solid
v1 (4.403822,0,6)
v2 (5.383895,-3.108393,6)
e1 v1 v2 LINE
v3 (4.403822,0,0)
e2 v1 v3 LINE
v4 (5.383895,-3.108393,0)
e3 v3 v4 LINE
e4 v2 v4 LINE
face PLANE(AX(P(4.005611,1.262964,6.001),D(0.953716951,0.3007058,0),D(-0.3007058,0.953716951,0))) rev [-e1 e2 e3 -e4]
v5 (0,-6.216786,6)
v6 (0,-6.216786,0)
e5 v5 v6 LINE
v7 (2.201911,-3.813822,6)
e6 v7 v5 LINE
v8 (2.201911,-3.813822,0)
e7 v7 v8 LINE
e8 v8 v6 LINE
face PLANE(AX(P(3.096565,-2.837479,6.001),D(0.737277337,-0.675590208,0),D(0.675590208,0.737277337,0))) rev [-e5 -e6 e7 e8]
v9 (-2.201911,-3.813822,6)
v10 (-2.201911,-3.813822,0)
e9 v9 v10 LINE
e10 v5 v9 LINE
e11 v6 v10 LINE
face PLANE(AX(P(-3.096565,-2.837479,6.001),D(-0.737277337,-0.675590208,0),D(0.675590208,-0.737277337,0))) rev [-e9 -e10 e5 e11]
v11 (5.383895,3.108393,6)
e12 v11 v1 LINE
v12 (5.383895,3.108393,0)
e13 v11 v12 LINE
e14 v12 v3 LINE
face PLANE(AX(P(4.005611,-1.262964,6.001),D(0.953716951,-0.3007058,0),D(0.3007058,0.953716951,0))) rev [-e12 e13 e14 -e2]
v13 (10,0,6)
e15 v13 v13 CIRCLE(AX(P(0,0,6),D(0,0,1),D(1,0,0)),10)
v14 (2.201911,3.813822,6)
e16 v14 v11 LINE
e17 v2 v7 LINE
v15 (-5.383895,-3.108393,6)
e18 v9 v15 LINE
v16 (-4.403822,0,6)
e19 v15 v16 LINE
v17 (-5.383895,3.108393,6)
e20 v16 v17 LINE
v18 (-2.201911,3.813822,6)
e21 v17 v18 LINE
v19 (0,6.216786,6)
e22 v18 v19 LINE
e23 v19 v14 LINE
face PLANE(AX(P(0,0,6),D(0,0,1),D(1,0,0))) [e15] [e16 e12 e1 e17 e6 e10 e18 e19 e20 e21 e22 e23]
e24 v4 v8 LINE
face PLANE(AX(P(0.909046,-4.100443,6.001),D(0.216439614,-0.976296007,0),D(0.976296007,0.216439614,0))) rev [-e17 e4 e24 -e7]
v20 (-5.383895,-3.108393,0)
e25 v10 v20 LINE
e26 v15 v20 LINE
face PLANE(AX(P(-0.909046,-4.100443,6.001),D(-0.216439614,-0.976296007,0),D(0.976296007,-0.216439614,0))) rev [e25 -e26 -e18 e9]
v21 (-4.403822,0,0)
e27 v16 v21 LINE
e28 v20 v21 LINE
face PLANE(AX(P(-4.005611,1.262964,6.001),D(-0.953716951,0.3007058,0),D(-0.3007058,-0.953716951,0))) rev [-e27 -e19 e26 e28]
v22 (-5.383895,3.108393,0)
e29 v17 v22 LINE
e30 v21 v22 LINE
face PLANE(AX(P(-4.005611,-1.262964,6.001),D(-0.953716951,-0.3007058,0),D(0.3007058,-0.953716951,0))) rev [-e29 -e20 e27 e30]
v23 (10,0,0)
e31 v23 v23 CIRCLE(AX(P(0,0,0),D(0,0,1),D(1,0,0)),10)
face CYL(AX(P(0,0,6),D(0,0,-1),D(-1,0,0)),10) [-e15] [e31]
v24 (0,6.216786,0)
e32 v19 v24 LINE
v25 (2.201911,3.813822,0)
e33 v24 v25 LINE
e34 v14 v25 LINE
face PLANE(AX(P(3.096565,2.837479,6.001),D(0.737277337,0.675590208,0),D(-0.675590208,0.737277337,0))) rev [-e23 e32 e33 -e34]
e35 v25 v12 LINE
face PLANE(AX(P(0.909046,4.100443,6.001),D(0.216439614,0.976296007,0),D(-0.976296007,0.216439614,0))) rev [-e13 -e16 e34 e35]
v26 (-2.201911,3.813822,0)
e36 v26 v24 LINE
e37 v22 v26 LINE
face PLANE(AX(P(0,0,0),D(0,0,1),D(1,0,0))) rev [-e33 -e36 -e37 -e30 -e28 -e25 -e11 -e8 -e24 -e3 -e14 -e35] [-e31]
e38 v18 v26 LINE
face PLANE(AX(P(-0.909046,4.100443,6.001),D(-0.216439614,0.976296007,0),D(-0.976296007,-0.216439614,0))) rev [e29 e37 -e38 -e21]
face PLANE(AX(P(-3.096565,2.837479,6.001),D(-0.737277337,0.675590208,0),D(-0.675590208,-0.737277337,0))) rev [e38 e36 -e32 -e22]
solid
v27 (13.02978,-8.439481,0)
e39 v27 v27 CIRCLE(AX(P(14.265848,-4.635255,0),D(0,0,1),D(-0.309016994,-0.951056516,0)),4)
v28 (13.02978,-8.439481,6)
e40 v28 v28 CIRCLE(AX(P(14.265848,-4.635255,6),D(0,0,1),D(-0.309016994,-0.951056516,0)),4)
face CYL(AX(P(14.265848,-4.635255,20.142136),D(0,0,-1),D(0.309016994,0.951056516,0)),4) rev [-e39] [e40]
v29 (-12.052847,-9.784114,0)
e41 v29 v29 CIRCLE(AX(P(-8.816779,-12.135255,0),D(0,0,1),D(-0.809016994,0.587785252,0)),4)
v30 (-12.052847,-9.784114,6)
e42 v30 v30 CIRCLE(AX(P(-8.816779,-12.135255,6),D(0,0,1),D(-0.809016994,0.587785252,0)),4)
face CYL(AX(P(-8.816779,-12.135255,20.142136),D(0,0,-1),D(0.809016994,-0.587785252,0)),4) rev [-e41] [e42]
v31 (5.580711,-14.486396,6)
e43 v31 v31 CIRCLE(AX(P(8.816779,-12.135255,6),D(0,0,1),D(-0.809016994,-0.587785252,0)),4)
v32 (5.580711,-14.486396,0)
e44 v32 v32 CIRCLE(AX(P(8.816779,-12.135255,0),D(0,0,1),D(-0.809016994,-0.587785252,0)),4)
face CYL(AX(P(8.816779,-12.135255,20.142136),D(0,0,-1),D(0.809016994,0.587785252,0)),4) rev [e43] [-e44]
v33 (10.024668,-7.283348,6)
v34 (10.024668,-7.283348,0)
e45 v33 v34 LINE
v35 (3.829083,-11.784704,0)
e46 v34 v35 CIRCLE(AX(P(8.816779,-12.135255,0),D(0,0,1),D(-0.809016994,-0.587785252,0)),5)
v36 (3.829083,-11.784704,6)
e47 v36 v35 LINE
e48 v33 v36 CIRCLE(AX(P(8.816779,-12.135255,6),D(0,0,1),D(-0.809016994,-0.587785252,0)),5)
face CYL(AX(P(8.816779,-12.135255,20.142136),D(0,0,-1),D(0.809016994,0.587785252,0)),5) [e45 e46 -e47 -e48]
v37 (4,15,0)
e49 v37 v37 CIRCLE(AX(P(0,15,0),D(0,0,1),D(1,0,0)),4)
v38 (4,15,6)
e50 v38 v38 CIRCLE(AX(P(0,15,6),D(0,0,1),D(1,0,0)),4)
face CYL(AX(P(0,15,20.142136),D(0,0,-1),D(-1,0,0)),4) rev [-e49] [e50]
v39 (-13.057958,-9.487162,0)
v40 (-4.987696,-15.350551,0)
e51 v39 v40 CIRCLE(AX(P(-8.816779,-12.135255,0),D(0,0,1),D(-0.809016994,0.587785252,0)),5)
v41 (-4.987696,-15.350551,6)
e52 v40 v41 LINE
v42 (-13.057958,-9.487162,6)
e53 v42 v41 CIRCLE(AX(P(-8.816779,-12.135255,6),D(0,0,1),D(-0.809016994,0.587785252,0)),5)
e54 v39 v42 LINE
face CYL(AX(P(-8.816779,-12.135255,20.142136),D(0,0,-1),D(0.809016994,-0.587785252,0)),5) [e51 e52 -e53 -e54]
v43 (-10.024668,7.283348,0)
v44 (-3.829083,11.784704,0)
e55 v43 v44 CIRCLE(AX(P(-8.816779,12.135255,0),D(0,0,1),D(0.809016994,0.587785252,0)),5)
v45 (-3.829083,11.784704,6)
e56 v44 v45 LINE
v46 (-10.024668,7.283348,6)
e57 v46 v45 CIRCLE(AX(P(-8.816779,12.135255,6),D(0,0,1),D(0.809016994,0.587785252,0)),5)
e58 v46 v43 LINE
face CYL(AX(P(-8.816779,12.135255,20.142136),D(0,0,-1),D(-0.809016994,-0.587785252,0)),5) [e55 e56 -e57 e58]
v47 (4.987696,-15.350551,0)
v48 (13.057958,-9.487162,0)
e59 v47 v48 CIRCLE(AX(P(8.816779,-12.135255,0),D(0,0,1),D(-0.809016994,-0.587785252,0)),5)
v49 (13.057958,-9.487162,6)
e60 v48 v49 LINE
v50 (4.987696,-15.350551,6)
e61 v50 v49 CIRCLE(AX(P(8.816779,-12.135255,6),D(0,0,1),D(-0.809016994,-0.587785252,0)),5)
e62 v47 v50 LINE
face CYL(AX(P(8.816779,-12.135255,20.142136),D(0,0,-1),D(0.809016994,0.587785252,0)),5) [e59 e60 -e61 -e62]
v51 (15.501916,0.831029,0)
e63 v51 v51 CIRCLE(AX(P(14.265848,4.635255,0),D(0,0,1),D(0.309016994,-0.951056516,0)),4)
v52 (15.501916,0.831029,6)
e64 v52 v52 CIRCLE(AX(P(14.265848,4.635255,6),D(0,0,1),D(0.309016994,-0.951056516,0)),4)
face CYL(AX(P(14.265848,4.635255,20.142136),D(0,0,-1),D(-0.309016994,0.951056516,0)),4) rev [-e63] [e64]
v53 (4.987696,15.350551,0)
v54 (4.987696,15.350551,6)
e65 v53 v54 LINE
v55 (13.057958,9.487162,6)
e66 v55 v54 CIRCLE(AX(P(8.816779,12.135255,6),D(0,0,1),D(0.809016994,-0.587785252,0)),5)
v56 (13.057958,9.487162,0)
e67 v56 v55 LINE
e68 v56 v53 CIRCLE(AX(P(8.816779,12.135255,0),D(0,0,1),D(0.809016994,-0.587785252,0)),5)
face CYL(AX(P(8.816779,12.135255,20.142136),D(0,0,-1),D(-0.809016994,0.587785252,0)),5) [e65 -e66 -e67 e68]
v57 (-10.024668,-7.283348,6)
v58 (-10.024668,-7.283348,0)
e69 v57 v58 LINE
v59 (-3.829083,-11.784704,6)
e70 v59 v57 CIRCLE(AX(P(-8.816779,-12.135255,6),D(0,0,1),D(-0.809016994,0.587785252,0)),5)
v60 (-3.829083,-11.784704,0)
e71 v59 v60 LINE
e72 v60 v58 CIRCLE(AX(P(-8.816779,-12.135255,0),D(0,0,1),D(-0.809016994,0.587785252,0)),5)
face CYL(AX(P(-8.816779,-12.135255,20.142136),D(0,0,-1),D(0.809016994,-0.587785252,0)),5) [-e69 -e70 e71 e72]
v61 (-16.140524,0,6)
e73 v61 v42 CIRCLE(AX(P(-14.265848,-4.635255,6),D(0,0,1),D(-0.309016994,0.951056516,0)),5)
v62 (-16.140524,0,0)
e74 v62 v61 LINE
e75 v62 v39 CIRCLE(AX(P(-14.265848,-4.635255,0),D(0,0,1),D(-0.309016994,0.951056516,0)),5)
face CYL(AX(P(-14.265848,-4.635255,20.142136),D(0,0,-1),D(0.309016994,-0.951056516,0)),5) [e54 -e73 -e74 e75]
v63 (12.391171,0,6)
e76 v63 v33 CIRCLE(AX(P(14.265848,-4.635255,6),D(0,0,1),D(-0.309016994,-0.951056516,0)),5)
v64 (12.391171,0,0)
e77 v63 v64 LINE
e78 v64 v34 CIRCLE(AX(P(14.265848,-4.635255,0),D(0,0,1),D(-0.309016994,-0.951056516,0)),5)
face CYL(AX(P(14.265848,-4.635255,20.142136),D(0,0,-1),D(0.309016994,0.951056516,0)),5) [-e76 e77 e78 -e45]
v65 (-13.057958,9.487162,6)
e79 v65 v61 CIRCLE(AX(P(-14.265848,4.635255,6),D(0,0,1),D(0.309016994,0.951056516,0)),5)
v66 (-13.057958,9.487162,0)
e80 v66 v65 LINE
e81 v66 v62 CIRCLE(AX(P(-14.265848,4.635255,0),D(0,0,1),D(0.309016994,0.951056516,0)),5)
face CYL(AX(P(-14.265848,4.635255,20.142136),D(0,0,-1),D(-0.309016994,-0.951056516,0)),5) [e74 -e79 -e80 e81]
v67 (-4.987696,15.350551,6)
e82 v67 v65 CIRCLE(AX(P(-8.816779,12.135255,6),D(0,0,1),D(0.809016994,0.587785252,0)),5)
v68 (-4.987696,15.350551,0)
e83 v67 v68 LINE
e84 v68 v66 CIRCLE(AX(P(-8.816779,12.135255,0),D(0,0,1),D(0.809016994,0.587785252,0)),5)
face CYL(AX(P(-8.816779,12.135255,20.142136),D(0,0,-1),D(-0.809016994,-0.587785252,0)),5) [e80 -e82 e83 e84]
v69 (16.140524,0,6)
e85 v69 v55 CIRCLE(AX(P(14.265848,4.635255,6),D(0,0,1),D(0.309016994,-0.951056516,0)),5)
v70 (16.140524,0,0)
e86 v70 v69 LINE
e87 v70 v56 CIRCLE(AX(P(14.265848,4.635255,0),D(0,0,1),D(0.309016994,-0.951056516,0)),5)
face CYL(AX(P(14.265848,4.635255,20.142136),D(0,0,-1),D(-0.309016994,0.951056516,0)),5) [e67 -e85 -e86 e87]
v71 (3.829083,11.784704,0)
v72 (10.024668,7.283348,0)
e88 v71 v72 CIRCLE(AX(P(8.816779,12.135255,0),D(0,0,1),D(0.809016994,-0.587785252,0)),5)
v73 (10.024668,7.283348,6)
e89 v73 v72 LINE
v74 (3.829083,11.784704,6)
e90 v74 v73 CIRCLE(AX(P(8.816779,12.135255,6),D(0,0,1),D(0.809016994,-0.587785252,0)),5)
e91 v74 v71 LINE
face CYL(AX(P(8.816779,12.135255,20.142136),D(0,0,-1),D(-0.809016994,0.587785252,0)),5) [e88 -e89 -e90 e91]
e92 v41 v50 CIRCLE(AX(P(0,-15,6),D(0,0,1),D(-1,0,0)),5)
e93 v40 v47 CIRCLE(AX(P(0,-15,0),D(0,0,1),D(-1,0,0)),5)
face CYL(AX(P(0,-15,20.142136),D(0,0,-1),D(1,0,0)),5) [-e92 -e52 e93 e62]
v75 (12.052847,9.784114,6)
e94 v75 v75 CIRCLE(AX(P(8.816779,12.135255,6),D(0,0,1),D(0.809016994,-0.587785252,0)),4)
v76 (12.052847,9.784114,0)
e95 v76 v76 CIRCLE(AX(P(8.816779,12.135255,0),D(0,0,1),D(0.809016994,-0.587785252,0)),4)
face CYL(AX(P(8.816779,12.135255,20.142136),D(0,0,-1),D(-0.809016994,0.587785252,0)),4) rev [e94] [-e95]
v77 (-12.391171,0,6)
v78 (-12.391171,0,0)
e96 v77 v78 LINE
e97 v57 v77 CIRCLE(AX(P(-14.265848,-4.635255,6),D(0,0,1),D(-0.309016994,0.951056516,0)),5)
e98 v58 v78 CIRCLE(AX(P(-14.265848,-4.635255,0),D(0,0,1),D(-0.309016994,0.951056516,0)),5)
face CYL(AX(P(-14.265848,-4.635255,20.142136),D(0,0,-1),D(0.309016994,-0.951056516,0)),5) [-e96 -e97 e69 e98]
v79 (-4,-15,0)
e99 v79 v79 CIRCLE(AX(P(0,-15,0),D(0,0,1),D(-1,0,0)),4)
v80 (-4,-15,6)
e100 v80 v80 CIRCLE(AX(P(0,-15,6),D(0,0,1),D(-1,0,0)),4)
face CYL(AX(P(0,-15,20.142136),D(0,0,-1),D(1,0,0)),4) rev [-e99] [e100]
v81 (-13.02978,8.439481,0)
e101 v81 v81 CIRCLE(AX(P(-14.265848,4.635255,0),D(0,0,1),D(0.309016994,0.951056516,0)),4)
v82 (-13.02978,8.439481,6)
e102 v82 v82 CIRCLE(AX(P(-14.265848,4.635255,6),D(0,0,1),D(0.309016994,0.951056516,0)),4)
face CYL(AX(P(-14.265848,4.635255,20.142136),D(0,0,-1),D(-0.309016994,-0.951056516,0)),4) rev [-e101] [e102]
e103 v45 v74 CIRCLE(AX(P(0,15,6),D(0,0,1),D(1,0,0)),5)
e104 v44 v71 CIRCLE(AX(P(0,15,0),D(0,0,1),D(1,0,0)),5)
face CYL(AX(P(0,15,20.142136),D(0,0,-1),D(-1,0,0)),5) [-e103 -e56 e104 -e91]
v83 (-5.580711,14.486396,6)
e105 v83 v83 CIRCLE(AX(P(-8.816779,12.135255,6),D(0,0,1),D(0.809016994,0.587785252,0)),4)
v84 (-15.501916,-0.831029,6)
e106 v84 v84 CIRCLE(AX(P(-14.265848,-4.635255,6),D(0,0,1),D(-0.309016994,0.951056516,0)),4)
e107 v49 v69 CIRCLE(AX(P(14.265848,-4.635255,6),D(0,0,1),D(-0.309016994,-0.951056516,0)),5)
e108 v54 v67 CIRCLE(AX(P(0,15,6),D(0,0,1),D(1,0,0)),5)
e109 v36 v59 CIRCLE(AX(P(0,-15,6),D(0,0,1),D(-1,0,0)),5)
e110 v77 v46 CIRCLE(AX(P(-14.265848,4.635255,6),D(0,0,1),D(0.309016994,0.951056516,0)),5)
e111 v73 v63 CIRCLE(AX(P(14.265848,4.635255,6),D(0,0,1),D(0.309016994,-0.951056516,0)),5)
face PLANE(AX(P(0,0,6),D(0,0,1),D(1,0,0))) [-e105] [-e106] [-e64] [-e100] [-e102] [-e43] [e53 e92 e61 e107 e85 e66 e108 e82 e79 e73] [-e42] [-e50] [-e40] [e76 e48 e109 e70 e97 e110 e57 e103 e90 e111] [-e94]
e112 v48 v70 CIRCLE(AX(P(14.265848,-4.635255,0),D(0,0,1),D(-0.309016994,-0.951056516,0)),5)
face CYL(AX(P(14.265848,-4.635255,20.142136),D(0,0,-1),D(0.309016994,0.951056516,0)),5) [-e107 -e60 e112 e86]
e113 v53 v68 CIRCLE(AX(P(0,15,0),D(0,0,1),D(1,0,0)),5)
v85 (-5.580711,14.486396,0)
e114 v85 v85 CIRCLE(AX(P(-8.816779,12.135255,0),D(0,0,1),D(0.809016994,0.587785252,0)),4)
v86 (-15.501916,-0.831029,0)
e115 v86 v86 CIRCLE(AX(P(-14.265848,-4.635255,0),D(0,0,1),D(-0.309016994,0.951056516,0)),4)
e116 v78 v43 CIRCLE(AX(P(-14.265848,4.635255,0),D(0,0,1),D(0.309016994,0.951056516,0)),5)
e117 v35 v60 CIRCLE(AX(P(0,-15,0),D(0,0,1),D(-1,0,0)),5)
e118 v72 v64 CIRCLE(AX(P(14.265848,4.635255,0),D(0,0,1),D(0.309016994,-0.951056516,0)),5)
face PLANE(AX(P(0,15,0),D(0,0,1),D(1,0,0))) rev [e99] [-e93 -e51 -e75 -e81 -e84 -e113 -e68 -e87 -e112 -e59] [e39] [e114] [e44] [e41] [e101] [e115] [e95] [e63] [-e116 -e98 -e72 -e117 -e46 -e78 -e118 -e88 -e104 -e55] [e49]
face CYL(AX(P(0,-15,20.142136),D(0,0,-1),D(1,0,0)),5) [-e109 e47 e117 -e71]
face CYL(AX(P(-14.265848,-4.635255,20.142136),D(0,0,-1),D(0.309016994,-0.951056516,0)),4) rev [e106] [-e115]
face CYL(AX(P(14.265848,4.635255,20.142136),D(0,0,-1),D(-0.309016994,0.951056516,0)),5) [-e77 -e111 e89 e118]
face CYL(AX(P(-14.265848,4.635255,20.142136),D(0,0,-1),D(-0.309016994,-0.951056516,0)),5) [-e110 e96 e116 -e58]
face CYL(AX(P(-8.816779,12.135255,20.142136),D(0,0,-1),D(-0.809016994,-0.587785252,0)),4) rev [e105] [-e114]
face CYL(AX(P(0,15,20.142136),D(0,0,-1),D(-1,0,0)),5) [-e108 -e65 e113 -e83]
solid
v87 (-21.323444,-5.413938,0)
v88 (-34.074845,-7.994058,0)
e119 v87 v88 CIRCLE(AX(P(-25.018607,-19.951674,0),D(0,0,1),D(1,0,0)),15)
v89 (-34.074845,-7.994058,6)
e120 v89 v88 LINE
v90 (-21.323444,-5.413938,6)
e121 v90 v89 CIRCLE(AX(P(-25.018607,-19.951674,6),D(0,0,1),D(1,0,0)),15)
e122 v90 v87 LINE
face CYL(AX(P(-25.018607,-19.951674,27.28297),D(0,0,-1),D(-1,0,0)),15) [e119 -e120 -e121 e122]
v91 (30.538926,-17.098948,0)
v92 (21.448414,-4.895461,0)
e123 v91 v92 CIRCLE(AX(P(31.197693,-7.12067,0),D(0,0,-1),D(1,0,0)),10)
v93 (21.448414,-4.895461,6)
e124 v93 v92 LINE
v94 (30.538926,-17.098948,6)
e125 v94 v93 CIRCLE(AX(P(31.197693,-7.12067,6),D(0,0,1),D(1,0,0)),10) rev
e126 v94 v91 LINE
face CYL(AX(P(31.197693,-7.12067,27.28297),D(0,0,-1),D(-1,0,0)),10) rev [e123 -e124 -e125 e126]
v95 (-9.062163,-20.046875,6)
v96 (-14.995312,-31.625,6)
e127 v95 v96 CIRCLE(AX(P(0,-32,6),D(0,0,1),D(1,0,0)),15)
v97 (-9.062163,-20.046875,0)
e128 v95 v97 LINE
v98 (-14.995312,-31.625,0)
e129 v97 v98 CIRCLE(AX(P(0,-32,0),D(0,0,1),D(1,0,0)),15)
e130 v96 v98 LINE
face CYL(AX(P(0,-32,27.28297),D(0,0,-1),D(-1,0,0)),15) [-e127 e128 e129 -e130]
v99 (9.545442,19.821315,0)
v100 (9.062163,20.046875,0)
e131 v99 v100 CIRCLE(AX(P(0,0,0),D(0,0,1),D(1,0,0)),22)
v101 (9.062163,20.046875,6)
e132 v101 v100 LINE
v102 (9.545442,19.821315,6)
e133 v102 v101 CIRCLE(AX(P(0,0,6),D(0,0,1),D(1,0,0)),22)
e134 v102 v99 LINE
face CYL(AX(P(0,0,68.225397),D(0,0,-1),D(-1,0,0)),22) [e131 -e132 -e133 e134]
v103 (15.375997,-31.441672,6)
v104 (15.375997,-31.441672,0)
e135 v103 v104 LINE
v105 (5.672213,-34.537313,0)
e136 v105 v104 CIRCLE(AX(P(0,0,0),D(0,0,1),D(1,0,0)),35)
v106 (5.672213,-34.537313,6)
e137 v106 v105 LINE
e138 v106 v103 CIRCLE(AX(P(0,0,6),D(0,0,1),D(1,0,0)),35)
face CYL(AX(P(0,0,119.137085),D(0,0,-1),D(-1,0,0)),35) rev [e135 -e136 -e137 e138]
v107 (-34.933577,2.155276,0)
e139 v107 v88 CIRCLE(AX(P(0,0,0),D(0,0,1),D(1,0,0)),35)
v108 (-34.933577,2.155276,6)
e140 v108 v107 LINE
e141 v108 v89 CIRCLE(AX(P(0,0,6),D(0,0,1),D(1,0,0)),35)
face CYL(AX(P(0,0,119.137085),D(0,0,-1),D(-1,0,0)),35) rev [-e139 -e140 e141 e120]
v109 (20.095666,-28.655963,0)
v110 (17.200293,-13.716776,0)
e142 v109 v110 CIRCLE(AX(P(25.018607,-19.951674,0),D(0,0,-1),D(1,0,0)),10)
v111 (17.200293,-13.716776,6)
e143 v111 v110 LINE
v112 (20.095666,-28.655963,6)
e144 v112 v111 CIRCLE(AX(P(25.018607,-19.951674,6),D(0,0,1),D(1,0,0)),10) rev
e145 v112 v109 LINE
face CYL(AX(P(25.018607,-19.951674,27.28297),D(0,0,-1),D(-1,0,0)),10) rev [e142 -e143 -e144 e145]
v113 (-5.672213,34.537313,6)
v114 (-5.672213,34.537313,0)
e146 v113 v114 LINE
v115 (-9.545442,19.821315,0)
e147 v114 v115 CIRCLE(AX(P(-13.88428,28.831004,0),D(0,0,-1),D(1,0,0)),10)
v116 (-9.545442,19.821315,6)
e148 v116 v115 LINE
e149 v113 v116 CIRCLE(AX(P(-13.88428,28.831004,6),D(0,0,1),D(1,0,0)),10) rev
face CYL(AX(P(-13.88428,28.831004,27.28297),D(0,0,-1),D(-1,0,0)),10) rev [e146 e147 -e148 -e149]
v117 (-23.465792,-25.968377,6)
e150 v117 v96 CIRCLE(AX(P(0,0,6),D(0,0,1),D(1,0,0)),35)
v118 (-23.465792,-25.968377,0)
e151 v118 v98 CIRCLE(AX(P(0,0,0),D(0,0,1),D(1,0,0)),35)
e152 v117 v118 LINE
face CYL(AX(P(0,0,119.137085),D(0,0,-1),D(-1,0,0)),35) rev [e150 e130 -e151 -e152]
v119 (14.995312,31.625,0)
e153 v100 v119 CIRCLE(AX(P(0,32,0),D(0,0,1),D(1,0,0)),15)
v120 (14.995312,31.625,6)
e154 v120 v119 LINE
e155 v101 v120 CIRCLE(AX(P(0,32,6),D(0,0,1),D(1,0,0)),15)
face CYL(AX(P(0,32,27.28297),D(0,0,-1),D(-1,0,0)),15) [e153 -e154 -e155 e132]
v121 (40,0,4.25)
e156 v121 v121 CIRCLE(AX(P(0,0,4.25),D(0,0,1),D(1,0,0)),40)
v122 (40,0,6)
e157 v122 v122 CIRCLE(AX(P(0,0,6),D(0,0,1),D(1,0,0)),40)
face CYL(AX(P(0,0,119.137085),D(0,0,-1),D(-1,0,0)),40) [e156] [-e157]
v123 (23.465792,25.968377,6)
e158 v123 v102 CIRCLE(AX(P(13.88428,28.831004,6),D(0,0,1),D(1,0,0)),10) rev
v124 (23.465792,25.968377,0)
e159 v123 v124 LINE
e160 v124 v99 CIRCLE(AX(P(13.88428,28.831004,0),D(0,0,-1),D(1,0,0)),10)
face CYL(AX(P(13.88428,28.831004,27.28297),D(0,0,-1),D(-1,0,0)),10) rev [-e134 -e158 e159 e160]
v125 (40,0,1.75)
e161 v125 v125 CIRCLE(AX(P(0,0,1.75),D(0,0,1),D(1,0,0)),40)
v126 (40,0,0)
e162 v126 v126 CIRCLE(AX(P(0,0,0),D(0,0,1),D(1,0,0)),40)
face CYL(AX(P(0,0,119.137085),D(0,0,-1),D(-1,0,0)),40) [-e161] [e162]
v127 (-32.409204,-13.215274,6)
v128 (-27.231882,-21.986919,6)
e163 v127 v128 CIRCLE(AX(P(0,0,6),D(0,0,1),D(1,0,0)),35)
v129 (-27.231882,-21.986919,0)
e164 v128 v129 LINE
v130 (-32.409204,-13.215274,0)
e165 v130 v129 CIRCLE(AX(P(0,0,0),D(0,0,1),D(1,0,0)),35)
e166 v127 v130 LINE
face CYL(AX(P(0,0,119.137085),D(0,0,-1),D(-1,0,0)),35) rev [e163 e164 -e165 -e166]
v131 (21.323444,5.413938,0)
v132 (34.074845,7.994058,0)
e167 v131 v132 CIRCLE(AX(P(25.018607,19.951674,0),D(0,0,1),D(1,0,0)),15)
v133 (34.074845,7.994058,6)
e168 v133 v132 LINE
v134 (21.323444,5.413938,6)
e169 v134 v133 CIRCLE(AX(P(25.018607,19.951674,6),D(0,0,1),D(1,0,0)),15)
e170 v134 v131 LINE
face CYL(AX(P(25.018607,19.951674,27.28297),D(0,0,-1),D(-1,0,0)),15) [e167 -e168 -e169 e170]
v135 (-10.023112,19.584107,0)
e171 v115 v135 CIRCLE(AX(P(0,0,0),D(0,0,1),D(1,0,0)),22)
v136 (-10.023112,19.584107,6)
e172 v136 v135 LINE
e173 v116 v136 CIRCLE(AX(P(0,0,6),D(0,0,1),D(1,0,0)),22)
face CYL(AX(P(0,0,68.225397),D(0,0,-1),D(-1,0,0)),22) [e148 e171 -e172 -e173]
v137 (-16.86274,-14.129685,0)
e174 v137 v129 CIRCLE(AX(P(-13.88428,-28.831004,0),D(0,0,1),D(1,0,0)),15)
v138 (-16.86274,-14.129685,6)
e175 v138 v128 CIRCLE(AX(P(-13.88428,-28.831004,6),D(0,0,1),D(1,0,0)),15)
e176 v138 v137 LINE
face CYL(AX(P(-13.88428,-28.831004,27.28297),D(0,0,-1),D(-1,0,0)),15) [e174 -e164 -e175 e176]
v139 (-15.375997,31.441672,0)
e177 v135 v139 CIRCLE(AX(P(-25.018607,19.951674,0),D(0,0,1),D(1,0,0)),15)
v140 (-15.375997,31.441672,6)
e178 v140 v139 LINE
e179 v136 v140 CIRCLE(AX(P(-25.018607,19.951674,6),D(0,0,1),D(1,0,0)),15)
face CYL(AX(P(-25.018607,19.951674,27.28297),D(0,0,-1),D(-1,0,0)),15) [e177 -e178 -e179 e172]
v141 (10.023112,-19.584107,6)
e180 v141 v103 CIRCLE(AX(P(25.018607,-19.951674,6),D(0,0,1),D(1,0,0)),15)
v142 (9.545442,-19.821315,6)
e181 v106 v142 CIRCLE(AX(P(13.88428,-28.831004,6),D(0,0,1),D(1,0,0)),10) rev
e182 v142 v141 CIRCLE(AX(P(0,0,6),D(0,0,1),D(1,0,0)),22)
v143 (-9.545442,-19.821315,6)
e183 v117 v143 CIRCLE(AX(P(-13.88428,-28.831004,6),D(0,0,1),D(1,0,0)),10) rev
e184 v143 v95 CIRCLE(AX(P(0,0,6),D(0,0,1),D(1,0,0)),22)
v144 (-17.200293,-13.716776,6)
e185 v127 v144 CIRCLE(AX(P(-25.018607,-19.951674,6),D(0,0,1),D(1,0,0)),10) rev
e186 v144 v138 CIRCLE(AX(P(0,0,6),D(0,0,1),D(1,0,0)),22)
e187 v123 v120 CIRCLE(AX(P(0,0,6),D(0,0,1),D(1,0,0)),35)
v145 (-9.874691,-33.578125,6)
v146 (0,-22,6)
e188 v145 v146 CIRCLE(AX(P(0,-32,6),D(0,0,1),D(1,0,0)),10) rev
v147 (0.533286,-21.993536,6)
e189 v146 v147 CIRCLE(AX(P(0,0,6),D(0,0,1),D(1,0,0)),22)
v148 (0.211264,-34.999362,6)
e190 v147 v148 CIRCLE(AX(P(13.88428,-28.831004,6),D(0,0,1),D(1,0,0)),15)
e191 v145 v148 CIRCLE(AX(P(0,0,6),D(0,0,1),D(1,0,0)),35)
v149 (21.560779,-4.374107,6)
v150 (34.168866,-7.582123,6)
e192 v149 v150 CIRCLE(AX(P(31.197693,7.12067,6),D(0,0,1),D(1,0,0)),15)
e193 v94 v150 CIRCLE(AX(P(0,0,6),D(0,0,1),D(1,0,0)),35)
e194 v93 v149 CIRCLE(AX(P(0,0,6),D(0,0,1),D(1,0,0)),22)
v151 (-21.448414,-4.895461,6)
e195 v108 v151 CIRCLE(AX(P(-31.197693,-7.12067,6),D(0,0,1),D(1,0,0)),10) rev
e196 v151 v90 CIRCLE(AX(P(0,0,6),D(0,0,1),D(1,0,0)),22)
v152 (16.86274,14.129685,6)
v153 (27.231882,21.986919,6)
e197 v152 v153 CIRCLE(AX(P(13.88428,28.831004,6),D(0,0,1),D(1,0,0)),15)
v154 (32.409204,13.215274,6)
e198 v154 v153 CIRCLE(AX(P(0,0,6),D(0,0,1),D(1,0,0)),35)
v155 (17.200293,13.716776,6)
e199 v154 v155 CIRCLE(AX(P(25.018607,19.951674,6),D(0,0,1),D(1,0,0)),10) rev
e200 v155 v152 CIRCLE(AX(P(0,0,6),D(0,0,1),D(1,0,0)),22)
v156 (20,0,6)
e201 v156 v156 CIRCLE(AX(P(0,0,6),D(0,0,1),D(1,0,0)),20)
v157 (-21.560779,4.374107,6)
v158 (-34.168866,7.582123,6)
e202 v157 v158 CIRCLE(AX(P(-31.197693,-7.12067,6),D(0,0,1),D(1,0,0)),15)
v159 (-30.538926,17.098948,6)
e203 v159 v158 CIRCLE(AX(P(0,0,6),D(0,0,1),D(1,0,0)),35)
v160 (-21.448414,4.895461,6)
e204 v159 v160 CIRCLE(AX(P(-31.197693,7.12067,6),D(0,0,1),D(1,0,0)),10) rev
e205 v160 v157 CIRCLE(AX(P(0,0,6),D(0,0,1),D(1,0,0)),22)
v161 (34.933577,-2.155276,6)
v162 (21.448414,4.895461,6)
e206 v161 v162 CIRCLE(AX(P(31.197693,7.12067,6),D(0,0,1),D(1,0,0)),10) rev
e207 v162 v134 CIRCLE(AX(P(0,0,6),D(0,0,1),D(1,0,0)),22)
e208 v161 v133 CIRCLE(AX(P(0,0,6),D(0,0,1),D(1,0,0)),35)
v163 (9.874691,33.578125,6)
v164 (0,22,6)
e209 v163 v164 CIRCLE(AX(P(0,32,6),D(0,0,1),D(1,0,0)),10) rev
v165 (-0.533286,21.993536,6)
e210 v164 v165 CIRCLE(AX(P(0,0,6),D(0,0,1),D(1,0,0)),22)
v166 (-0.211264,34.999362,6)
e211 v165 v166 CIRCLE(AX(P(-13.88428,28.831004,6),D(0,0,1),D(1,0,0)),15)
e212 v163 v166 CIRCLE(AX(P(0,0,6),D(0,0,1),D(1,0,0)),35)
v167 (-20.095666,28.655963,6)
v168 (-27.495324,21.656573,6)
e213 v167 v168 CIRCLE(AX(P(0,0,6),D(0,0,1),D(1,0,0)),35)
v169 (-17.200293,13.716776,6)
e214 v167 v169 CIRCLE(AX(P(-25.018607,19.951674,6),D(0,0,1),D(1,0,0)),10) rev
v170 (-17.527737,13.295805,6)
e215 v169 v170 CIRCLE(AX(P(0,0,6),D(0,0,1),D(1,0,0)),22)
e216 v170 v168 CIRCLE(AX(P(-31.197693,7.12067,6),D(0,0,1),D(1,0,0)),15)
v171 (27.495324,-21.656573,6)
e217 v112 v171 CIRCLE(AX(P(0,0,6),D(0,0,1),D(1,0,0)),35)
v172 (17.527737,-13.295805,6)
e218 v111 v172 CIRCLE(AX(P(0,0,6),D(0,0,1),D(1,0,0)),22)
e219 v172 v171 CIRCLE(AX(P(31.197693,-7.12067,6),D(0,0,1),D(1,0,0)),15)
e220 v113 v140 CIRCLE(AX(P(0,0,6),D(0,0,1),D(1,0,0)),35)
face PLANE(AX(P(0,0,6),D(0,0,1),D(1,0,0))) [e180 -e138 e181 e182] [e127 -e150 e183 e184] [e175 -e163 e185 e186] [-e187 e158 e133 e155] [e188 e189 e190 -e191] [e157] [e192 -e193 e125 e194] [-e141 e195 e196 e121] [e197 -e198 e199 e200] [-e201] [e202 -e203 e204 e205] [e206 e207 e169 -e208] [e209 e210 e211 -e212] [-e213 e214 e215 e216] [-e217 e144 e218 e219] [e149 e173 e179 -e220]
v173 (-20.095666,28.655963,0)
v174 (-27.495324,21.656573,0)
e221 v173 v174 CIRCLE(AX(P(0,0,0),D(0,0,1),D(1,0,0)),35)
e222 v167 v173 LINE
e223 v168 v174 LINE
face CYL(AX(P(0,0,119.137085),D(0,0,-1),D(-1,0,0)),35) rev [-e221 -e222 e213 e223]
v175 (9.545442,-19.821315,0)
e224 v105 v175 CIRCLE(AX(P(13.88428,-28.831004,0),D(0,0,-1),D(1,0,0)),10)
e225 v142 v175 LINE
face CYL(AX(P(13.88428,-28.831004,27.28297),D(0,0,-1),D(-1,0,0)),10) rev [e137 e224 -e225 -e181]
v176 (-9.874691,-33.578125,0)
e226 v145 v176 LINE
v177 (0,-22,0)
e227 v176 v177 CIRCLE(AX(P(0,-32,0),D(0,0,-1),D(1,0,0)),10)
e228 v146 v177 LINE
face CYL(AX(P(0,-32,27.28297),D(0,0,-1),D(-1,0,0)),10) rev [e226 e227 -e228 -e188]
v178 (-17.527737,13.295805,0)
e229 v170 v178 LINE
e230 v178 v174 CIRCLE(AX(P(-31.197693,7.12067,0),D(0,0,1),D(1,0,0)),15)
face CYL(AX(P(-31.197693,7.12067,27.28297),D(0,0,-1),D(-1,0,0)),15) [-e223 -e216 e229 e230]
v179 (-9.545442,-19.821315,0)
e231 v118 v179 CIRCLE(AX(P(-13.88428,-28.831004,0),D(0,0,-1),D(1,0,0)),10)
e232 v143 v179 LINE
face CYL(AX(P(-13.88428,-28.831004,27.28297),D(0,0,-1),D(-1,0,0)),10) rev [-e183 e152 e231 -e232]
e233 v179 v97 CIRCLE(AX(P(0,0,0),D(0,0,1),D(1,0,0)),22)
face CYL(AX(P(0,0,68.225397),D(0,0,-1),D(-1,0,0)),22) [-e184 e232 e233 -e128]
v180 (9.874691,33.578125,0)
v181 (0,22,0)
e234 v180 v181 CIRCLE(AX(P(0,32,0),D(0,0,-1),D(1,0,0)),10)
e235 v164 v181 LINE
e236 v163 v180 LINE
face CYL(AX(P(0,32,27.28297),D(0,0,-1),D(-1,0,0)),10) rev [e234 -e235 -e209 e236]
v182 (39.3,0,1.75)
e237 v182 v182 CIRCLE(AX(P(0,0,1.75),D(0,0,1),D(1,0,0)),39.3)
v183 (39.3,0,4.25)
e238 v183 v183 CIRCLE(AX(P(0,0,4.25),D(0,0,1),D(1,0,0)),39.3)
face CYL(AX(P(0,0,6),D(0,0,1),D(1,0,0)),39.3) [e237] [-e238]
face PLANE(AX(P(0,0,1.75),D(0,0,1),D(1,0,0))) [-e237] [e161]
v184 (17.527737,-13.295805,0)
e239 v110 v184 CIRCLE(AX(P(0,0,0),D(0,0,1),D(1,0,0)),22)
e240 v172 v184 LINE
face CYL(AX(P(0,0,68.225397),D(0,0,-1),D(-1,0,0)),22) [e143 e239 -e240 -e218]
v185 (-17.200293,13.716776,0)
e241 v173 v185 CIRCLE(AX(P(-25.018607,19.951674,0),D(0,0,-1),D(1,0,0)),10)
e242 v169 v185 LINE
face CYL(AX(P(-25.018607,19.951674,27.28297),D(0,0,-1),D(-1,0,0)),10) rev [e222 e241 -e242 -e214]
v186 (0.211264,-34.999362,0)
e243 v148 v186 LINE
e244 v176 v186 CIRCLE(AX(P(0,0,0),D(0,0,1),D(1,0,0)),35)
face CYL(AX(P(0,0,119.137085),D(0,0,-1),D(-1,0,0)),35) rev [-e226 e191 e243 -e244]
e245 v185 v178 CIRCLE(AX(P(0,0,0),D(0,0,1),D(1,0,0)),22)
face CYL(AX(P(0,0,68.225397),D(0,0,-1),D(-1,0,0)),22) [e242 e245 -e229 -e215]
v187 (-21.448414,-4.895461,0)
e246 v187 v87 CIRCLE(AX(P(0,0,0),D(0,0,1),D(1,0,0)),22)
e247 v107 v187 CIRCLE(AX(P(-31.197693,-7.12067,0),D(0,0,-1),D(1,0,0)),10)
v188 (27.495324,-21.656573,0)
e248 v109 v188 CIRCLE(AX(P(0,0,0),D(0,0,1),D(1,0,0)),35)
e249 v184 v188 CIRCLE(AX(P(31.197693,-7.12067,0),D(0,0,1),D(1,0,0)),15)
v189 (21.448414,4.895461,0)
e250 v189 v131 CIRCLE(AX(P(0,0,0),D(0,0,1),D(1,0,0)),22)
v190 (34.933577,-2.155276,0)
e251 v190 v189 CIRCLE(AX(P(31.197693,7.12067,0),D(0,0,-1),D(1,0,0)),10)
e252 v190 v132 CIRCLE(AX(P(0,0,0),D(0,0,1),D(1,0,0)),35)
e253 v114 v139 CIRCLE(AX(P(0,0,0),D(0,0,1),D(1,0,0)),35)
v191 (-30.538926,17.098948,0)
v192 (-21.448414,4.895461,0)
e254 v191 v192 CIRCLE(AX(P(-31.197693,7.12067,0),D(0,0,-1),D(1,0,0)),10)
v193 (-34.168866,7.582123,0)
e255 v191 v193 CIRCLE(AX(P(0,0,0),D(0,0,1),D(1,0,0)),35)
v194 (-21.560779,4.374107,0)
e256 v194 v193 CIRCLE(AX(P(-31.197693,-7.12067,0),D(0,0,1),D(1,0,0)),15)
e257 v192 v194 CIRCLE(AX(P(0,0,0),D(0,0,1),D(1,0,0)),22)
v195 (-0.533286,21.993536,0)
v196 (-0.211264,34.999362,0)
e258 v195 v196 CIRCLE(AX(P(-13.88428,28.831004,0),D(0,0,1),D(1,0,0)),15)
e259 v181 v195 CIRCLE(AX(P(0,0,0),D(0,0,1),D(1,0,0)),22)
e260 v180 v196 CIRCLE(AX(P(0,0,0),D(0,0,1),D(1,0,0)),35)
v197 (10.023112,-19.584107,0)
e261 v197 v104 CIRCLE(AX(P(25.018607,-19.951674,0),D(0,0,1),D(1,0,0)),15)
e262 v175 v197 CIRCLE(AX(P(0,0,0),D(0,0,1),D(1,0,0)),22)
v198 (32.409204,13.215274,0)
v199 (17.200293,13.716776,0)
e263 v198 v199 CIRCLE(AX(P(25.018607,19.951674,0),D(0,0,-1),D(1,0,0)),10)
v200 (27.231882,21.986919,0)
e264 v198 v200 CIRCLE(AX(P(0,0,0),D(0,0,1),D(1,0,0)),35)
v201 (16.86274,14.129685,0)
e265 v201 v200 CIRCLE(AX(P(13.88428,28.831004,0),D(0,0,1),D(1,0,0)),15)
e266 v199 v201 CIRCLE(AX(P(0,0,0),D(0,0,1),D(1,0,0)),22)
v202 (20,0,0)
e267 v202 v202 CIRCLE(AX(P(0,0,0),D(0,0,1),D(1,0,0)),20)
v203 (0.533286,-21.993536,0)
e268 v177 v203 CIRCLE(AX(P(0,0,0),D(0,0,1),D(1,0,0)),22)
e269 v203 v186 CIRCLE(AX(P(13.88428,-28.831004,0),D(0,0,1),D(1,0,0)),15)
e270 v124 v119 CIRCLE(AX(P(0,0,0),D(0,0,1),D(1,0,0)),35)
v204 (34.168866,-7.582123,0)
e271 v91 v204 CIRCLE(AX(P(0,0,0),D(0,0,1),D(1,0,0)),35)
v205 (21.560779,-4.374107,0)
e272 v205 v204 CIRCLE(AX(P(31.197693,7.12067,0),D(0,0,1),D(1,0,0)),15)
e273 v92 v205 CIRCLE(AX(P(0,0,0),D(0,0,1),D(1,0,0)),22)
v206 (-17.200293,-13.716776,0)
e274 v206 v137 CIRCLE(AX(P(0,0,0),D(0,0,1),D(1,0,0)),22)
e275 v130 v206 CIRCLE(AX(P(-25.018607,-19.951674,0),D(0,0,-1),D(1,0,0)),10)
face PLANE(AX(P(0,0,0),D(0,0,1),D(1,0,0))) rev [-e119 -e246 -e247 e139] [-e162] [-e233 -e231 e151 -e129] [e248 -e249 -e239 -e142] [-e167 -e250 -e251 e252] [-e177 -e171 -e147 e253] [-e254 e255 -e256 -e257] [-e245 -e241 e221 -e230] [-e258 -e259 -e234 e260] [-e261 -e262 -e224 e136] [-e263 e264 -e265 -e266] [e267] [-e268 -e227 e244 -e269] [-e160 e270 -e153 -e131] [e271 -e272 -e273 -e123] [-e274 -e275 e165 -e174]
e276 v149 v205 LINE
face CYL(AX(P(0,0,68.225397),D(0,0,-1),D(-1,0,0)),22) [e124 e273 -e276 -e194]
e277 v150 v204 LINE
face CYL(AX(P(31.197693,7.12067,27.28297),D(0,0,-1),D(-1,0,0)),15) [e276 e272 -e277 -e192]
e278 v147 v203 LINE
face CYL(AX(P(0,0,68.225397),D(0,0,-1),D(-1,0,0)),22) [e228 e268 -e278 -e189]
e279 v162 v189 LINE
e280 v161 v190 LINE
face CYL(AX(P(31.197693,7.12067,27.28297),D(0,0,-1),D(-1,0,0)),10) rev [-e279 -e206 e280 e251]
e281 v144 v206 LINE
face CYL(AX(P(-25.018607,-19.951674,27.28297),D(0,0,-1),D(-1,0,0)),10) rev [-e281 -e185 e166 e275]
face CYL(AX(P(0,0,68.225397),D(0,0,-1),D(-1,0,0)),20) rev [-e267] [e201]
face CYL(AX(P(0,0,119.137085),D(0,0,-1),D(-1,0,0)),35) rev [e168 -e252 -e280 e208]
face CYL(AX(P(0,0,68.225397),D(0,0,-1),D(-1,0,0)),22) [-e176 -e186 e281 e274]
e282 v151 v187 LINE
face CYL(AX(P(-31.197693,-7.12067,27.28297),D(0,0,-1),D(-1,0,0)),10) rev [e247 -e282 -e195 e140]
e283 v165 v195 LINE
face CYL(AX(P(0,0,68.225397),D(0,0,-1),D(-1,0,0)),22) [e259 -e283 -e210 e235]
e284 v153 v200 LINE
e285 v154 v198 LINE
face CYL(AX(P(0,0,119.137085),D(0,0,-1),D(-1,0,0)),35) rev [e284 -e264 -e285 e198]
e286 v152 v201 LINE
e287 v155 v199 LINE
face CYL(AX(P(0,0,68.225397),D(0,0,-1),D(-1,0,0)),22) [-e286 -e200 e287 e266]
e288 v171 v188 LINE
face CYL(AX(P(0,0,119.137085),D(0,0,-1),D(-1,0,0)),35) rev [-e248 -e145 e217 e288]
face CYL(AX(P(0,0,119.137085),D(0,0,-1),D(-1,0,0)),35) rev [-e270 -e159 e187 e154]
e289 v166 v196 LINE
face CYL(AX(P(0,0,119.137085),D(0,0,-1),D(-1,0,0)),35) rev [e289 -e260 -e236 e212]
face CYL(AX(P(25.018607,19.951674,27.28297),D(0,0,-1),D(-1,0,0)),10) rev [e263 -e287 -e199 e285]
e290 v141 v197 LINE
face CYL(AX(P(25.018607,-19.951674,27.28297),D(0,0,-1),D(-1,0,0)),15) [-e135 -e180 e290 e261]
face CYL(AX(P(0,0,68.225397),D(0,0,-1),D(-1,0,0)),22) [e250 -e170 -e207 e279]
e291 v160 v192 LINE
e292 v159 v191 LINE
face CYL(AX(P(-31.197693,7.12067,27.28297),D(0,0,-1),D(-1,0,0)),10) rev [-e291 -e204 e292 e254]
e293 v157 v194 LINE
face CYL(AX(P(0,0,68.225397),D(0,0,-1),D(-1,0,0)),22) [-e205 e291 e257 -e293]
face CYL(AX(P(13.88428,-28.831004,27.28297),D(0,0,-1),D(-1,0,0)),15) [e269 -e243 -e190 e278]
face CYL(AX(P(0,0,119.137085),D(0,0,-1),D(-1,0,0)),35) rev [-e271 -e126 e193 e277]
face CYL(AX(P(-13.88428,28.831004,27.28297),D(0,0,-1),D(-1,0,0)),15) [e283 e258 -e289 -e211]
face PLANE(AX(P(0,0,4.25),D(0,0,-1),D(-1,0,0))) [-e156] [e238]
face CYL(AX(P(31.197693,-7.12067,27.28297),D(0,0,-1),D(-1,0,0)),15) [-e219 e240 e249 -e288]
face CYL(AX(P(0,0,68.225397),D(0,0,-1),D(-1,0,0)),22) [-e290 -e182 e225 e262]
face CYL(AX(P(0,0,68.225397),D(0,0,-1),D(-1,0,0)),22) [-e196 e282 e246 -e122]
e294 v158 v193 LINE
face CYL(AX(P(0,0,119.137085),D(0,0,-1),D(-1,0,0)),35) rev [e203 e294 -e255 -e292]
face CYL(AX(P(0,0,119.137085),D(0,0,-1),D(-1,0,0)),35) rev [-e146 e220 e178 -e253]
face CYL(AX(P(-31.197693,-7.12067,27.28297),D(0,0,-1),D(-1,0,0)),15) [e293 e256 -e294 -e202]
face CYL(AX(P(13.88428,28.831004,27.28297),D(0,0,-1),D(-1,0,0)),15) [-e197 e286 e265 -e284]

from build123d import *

# Parameters (mm, degrees)
SKETCH2_R           = 10
SKETCH2_R_2         = 1
BOSS_EXTRUDE2_DEPTH = 6
SKETCH3_R           = 5
SKETCH3_R_2         = 4
BOSS_EXTRUDE3_DEPTH = 6
CIRPATTERN1_COUNT   = 10
SKETCH5_R           = 22
SKETCH5_R_2         = 20
BOSS_EXTRUDE4_DEPTH = 6
SKETCH6_R           = 40
SKETCH6_R_2         = 35
BOSS_EXTRUDE5_DEPTH = 6
BOSS_EXTRUDE6_DEPTH = 6
CAVITY1_OUTLINE_R   = 1
CAVITY1_DEPTH       = 6
CUT_EXTRUDE1_DEPTH  = 6
SKETCH10_W          = 0.7
SKETCH10_H          = 1.25


# Read off the part's stored shape, not the designer's step: Cavity1
with BuildPart() as part:
    # Sketch2 → Boss-Extrude2 (new body)
    with BuildSketch(Plane.XY):
        Circle(SKETCH2_R)
        Circle(SKETCH2_R_2, mode=Mode.SUBTRACT)
    extrude(amount=BOSS_EXTRUDE2_DEPTH)

    # Cavity1 outline → Cavity1 (cut)
    with BuildSketch(Plane.XY):
        Polygon((5.127518984, -2.960374466), (4.194116501, 0), (5.127518984, 2.960374466), (2.09705825, 3.632211436), (0, 5.920748932), (-2.09705825, 3.632211436), (-5.127518984, 2.960374466), (-4.194116501, 0), (-5.127518984, -2.960374466), (-2.09705825, -3.632211436), (0, -5.920748932), (2.09705825, -3.632211436), align=None)
        Circle(CAVITY1_OUTLINE_R, mode=Mode.SUBTRACT)
    extrude(amount=CAVITY1_DEPTH, mode=Mode.SUBTRACT)

    # Sketch8 → Cut-Extrude1 (cut)
    # profile 1 of 2: a face of its own
    with BuildSketch(Plane(origin=(0, 0, 0), x_dir=(-1, 0, 0), z_dir=(0, 0, -1))):
        Polygon((5.383894933, -3.108393189), (4.403822326, 0), (5.383894933, 3.108393189), (2.201911163, 3.813822008), (0, 6.216786378), (-2.201911163, 3.813822008), (-5.383894933, 3.108393189), (-4.403822326, 0), (-5.383894933, -3.108393189), (-2.201911163, -3.813822008), (0, -6.216786378), (2.201911163, -3.813822008), align=None)
        Polygon((-2.09705825, -3.632211436), (-5.127518984, -2.960374466), (-4.194116501, 0), (-5.127518984, 2.960374466), (-2.09705825, 3.632211436), (0, 5.920748932), (2.09705825, 3.632211436), (5.127518984, 2.960374466), (4.194116501, 0), (5.127518984, -2.960374466), (2.09705825, -3.632211436), (0, -5.920748932), align=None, mode=Mode.SUBTRACT)
    # profile 2 of 2: a face of its own
    with BuildSketch(Plane(origin=(0, 0, 0), x_dir=(-1, 0, 0), z_dir=(0, 0, -1))):
        Polygon((-5.127518984, -2.960374466), (-4.194116501, 0), (-5.127518984, 2.960374466), (-2.09705825, 3.632211436), (0, 5.920748932), (2.09705825, 3.632211436), (5.127518984, 2.960374466), (4.194116501, 0), (5.127518984, -2.960374466), (2.09705825, -3.632211436), (0, -5.920748932), (-2.09705825, -3.632211436), align=None)
    extrude(amount=-CUT_EXTRUDE1_DEPTH, mode=Mode.SUBTRACT)


with BuildPart() as body_2:
    # Sketch3 → Boss-Extrude3 (new body)
    with BuildSketch(Plane.XY):
        with Locations((0, 15)):
            Circle(SKETCH3_R)
        with Locations((0, 15)):
            Circle(SKETCH3_R_2, mode=Mode.SUBTRACT)
    boss_extrude3 = extrude(amount=BOSS_EXTRUDE3_DEPTH)

    # CirPattern1: Boss-Extrude3 ×10 about axis
    cirpattern1_axis = Axis((0, 0, 0), (0, 0, 1))
    for i in range(1, CIRPATTERN1_COUNT):
        add(boss_extrude3.rotate(cirpattern1_axis, i * 360 / CIRPATTERN1_COUNT))


with BuildPart() as body_3:
    # Sketch5 → Boss-Extrude4 (new body)
    with BuildSketch(Plane.XY):
        Circle(SKETCH5_R)
        Circle(SKETCH5_R_2, mode=Mode.SUBTRACT)
    extrude(amount=BOSS_EXTRUDE4_DEPTH)



with BuildPart() as body_4:
    # Sketch6 → Boss-Extrude5 (new body)
    with BuildSketch(Plane.XY):
        Circle(SKETCH6_R)
        Circle(SKETCH6_R_2, mode=Mode.SUBTRACT)
    extrude(amount=BOSS_EXTRUDE5_DEPTH)


with BuildPart() as body_3_1:
    add(body_3.part)

    add(body_4.part)  # Boss-Extrude6 merges body 4
    # Sketch7 → Boss-Extrude6 (add)
    with BuildSketch(Plane.XY):
        with BuildLine():
            ThreePointArc((0, 22), (7.608588897, 25.510826324), (9.874690956, 33.578125))
            ThreePointArc((9.874690956, 33.578125), (12.473288788, 32.70194286), (14.995311767, 31.625))
            ThreePointArc((14.995311767, 31.625), (13.349298508, 25.159223045), (9.062163248, 20.046875))
            ThreePointArc((9.062163248, 20.046875), (4.635124054, 21.506176438), (0, 22))
        make_face()
        with BuildLine():
            ThreePointArc((16.862740045, 14.129684999), (13.507282719, 17.365290483), (9.545442261, 19.821315094))
            ThreePointArc((9.545442261, 19.821315094), (17.923834438, 19.683217312), (23.465791559, 25.968377433))
            ThreePointArc((23.465791559, 25.968377433), (25.426886123, 24.051475258), (27.231882316, 21.986918509))
            ThreePointArc((27.231882316, 21.986918509), (22.943480132, 16.875633153), (16.862740045, 14.129684999))
        make_face()
        with BuildLine():
            ThreePointArc((21.323444368, 5.413937595), (19.704158385, 9.784995775), (17.200292614, 13.716775641))
            ThreePointArc((17.200292614, 13.716775641), (24.689044747, 9.957105713), (32.409204355, 13.215274234))
            ThreePointArc((32.409204355, 13.215274234), (33.344376821, 10.63731801), (34.074844596, 7.994058155))
            ThreePointArc((34.074844596, 7.994058155), (27.993424133, 5.249617149), (21.323444368, 5.413937595))
        make_face()
        with BuildLine():
            ThreePointArc((21.560779019, -4.374106547), (21.998383828, 0.26666265), (21.448414068, 4.895460547))
            ThreePointArc((21.448414068, 4.895460547), (26.564286953, -1.741132788), (34.933576755, -2.155276102))
            ThreePointArc((34.933576755, -2.155276102), (34.657604747, -4.883690529), (34.168866002, -7.582123457))
            ThreePointArc((34.168866002, -7.582123457), (27.498927167, -7.416149914), (21.560779019, -4.374106547))
        make_face()
        with BuildLine():
            ThreePointArc((17.52773696, -13.295805243), (19.935559561, -9.304486284), (21.448414068, -4.895460547))
            ThreePointArc((21.448414068, -4.895460547), (23.178146338, -13.094518587), (30.538925847, -17.098947573))
            ThreePointArc((30.538925847, -17.098947573), (29.106469006, -19.437424263), (27.495324443, -21.65657253))
            ThreePointArc((27.495324443, -21.65657253), (21.557930424, -18.613057533), (17.52773696, -13.295805243))
        make_face()
        with BuildLine():
            ThreePointArc((10.023111632, -19.584106648), (13.924253229, -17.032767597), (17.200292614, -13.716775641))
            ThreePointArc((17.200292614, -13.716775641), (15.20128958, -21.854374387), (20.095666139, -28.655962772))
            ThreePointArc((20.095666139, -28.655962772), (17.790440111, -30.141337738), (15.37599667, -31.441671813))
            ThreePointArc((15.37599667, -31.441671813), (11.34712117, -26.123420834), (10.023111632, -19.584106648))
        make_face()
        with BuildLine():
            ThreePointArc((0.53328612, -21.993535548), (5.155077775, -21.387500395), (9.545442261, -19.821315094))
            ThreePointArc((9.545442261, -19.821315094), (4.213630989, -26.285703312), (5.672213296, -34.537313102))
            ThreePointArc((5.672213296, -34.537313102), (2.950796366, -34.875389615), (0.211264183, -34.999362386))
            ThreePointArc((0.211264183, -34.999362386), (-1.111124596, -28.459720256), (0.53328612, -21.993535548))
        make_face()
        with BuildLine():
            ThreePointArc((-9.062163248, -20.046875), (-4.635124054, -21.506176438), (0, -22))
            ThreePointArc((0, -22), (-7.608588897, -25.510826324), (-9.874690956, -33.578125))
            ThreePointArc((-9.874690956, -33.578125), (-12.473288788, -32.70194286), (-14.995311767, -31.625))
            ThreePointArc((-14.995311767, -31.625), (-13.349298508, -25.159223045), (-9.062163248, -20.046875))
        make_face()
        with BuildLine():
            ThreePointArc((-16.862740045, -14.129684999), (-13.507282719, -17.365290483), (-9.545442261, -19.821315094))
            ThreePointArc((-9.545442261, -19.821315094), (-17.923834438, -19.683217312), (-23.465791559, -25.968377433))
            ThreePointArc((-23.465791559, -25.968377433), (-25.426886123, -24.051475258), (-27.231882316, -21.986918509))
            ThreePointArc((-27.231882316, -21.986918509), (-22.943480132, -16.875633153), (-16.862740045, -14.129684999))
        make_face()
        with BuildLine():
            ThreePointArc((-21.323444368, -5.413937595), (-19.704158385, -9.784995775), (-17.200292614, -13.716775641))
            ThreePointArc((-17.200292614, -13.716775641), (-24.689044747, -9.957105713), (-32.409204355, -13.215274234))
            ThreePointArc((-32.409204355, -13.215274234), (-33.344376821, -10.63731801), (-34.074844596, -7.994058155))
            ThreePointArc((-34.074844596, -7.994058155), (-27.993424133, -5.249617149), (-21.323444368, -5.413937595))
        make_face()
        with BuildLine():
            ThreePointArc((-21.560779019, 4.374106547), (-21.998383828, -0.26666265), (-21.448414068, -4.895460547))
            ThreePointArc((-21.448414068, -4.895460547), (-26.564286953, 1.741132788), (-34.933576755, 2.155276102))
            ThreePointArc((-34.933576755, 2.155276102), (-34.657604747, 4.883690529), (-34.168866002, 7.582123457))
            ThreePointArc((-34.168866002, 7.582123457), (-27.498927167, 7.416149914), (-21.560779019, 4.374106547))
        make_face()
        with BuildLine():
            ThreePointArc((-17.52773696, 13.295805243), (-19.935559561, 9.304486284), (-21.448414068, 4.895460547))
            ThreePointArc((-21.448414068, 4.895460547), (-23.178146338, 13.094518587), (-30.538925847, 17.098947573))
            ThreePointArc((-30.538925847, 17.098947573), (-29.106469006, 19.437424263), (-27.495324443, 21.65657253))
            ThreePointArc((-27.495324443, 21.65657253), (-21.557930424, 18.613057533), (-17.52773696, 13.295805243))
        make_face()
        with BuildLine():
            ThreePointArc((-10.023111632, 19.584106648), (-13.924253229, 17.032767597), (-17.200292614, 13.716775641))
            ThreePointArc((-17.200292614, 13.716775641), (-15.20128958, 21.854374387), (-20.095666139, 28.655962772))
            ThreePointArc((-20.095666139, 28.655962772), (-17.790440111, 30.141337738), (-15.37599667, 31.441671813))
            ThreePointArc((-15.37599667, 31.441671813), (-11.34712117, 26.123420834), (-10.023111632, 19.584106648))
        make_face()
        with BuildLine():
            ThreePointArc((-0.53328612, 21.993535548), (-5.155077775, 21.387500395), (-9.545442261, 19.821315094))
            ThreePointArc((-9.545442261, 19.821315094), (-4.213630989, 26.285703312), (-5.672213296, 34.537313102))
            ThreePointArc((-5.672213296, 34.537313102), (-2.950796366, 34.875389615), (-0.211264183, 34.999362386))
            ThreePointArc((-0.211264183, 34.999362386), (1.111124596, 28.459720256), (-0.53328612, 21.993535548))
        make_face()
    extrude(amount=BOSS_EXTRUDE6_DEPTH)

    # Sketch10 → Cut-Revolve1 (revolve, cut)
    with BuildSketch(Plane(origin=(0, 0, 0), x_dir=(1, 0, 0), z_dir=(0, 1, 0))):
        with Locations((39.65, -2.375)):
            Rectangle(SKETCH10_W, SKETCH10_H)
        with Locations((39.65, -3.625)):
            Rectangle(SKETCH10_W, SKETCH10_H)
    revolve(axis=Axis((0, 0, 68.225396744), (0, 0, -1)), mode=Mode.SUBTRACT)


solid = Compound([part.part, body_2.part, body_3_1.part])
